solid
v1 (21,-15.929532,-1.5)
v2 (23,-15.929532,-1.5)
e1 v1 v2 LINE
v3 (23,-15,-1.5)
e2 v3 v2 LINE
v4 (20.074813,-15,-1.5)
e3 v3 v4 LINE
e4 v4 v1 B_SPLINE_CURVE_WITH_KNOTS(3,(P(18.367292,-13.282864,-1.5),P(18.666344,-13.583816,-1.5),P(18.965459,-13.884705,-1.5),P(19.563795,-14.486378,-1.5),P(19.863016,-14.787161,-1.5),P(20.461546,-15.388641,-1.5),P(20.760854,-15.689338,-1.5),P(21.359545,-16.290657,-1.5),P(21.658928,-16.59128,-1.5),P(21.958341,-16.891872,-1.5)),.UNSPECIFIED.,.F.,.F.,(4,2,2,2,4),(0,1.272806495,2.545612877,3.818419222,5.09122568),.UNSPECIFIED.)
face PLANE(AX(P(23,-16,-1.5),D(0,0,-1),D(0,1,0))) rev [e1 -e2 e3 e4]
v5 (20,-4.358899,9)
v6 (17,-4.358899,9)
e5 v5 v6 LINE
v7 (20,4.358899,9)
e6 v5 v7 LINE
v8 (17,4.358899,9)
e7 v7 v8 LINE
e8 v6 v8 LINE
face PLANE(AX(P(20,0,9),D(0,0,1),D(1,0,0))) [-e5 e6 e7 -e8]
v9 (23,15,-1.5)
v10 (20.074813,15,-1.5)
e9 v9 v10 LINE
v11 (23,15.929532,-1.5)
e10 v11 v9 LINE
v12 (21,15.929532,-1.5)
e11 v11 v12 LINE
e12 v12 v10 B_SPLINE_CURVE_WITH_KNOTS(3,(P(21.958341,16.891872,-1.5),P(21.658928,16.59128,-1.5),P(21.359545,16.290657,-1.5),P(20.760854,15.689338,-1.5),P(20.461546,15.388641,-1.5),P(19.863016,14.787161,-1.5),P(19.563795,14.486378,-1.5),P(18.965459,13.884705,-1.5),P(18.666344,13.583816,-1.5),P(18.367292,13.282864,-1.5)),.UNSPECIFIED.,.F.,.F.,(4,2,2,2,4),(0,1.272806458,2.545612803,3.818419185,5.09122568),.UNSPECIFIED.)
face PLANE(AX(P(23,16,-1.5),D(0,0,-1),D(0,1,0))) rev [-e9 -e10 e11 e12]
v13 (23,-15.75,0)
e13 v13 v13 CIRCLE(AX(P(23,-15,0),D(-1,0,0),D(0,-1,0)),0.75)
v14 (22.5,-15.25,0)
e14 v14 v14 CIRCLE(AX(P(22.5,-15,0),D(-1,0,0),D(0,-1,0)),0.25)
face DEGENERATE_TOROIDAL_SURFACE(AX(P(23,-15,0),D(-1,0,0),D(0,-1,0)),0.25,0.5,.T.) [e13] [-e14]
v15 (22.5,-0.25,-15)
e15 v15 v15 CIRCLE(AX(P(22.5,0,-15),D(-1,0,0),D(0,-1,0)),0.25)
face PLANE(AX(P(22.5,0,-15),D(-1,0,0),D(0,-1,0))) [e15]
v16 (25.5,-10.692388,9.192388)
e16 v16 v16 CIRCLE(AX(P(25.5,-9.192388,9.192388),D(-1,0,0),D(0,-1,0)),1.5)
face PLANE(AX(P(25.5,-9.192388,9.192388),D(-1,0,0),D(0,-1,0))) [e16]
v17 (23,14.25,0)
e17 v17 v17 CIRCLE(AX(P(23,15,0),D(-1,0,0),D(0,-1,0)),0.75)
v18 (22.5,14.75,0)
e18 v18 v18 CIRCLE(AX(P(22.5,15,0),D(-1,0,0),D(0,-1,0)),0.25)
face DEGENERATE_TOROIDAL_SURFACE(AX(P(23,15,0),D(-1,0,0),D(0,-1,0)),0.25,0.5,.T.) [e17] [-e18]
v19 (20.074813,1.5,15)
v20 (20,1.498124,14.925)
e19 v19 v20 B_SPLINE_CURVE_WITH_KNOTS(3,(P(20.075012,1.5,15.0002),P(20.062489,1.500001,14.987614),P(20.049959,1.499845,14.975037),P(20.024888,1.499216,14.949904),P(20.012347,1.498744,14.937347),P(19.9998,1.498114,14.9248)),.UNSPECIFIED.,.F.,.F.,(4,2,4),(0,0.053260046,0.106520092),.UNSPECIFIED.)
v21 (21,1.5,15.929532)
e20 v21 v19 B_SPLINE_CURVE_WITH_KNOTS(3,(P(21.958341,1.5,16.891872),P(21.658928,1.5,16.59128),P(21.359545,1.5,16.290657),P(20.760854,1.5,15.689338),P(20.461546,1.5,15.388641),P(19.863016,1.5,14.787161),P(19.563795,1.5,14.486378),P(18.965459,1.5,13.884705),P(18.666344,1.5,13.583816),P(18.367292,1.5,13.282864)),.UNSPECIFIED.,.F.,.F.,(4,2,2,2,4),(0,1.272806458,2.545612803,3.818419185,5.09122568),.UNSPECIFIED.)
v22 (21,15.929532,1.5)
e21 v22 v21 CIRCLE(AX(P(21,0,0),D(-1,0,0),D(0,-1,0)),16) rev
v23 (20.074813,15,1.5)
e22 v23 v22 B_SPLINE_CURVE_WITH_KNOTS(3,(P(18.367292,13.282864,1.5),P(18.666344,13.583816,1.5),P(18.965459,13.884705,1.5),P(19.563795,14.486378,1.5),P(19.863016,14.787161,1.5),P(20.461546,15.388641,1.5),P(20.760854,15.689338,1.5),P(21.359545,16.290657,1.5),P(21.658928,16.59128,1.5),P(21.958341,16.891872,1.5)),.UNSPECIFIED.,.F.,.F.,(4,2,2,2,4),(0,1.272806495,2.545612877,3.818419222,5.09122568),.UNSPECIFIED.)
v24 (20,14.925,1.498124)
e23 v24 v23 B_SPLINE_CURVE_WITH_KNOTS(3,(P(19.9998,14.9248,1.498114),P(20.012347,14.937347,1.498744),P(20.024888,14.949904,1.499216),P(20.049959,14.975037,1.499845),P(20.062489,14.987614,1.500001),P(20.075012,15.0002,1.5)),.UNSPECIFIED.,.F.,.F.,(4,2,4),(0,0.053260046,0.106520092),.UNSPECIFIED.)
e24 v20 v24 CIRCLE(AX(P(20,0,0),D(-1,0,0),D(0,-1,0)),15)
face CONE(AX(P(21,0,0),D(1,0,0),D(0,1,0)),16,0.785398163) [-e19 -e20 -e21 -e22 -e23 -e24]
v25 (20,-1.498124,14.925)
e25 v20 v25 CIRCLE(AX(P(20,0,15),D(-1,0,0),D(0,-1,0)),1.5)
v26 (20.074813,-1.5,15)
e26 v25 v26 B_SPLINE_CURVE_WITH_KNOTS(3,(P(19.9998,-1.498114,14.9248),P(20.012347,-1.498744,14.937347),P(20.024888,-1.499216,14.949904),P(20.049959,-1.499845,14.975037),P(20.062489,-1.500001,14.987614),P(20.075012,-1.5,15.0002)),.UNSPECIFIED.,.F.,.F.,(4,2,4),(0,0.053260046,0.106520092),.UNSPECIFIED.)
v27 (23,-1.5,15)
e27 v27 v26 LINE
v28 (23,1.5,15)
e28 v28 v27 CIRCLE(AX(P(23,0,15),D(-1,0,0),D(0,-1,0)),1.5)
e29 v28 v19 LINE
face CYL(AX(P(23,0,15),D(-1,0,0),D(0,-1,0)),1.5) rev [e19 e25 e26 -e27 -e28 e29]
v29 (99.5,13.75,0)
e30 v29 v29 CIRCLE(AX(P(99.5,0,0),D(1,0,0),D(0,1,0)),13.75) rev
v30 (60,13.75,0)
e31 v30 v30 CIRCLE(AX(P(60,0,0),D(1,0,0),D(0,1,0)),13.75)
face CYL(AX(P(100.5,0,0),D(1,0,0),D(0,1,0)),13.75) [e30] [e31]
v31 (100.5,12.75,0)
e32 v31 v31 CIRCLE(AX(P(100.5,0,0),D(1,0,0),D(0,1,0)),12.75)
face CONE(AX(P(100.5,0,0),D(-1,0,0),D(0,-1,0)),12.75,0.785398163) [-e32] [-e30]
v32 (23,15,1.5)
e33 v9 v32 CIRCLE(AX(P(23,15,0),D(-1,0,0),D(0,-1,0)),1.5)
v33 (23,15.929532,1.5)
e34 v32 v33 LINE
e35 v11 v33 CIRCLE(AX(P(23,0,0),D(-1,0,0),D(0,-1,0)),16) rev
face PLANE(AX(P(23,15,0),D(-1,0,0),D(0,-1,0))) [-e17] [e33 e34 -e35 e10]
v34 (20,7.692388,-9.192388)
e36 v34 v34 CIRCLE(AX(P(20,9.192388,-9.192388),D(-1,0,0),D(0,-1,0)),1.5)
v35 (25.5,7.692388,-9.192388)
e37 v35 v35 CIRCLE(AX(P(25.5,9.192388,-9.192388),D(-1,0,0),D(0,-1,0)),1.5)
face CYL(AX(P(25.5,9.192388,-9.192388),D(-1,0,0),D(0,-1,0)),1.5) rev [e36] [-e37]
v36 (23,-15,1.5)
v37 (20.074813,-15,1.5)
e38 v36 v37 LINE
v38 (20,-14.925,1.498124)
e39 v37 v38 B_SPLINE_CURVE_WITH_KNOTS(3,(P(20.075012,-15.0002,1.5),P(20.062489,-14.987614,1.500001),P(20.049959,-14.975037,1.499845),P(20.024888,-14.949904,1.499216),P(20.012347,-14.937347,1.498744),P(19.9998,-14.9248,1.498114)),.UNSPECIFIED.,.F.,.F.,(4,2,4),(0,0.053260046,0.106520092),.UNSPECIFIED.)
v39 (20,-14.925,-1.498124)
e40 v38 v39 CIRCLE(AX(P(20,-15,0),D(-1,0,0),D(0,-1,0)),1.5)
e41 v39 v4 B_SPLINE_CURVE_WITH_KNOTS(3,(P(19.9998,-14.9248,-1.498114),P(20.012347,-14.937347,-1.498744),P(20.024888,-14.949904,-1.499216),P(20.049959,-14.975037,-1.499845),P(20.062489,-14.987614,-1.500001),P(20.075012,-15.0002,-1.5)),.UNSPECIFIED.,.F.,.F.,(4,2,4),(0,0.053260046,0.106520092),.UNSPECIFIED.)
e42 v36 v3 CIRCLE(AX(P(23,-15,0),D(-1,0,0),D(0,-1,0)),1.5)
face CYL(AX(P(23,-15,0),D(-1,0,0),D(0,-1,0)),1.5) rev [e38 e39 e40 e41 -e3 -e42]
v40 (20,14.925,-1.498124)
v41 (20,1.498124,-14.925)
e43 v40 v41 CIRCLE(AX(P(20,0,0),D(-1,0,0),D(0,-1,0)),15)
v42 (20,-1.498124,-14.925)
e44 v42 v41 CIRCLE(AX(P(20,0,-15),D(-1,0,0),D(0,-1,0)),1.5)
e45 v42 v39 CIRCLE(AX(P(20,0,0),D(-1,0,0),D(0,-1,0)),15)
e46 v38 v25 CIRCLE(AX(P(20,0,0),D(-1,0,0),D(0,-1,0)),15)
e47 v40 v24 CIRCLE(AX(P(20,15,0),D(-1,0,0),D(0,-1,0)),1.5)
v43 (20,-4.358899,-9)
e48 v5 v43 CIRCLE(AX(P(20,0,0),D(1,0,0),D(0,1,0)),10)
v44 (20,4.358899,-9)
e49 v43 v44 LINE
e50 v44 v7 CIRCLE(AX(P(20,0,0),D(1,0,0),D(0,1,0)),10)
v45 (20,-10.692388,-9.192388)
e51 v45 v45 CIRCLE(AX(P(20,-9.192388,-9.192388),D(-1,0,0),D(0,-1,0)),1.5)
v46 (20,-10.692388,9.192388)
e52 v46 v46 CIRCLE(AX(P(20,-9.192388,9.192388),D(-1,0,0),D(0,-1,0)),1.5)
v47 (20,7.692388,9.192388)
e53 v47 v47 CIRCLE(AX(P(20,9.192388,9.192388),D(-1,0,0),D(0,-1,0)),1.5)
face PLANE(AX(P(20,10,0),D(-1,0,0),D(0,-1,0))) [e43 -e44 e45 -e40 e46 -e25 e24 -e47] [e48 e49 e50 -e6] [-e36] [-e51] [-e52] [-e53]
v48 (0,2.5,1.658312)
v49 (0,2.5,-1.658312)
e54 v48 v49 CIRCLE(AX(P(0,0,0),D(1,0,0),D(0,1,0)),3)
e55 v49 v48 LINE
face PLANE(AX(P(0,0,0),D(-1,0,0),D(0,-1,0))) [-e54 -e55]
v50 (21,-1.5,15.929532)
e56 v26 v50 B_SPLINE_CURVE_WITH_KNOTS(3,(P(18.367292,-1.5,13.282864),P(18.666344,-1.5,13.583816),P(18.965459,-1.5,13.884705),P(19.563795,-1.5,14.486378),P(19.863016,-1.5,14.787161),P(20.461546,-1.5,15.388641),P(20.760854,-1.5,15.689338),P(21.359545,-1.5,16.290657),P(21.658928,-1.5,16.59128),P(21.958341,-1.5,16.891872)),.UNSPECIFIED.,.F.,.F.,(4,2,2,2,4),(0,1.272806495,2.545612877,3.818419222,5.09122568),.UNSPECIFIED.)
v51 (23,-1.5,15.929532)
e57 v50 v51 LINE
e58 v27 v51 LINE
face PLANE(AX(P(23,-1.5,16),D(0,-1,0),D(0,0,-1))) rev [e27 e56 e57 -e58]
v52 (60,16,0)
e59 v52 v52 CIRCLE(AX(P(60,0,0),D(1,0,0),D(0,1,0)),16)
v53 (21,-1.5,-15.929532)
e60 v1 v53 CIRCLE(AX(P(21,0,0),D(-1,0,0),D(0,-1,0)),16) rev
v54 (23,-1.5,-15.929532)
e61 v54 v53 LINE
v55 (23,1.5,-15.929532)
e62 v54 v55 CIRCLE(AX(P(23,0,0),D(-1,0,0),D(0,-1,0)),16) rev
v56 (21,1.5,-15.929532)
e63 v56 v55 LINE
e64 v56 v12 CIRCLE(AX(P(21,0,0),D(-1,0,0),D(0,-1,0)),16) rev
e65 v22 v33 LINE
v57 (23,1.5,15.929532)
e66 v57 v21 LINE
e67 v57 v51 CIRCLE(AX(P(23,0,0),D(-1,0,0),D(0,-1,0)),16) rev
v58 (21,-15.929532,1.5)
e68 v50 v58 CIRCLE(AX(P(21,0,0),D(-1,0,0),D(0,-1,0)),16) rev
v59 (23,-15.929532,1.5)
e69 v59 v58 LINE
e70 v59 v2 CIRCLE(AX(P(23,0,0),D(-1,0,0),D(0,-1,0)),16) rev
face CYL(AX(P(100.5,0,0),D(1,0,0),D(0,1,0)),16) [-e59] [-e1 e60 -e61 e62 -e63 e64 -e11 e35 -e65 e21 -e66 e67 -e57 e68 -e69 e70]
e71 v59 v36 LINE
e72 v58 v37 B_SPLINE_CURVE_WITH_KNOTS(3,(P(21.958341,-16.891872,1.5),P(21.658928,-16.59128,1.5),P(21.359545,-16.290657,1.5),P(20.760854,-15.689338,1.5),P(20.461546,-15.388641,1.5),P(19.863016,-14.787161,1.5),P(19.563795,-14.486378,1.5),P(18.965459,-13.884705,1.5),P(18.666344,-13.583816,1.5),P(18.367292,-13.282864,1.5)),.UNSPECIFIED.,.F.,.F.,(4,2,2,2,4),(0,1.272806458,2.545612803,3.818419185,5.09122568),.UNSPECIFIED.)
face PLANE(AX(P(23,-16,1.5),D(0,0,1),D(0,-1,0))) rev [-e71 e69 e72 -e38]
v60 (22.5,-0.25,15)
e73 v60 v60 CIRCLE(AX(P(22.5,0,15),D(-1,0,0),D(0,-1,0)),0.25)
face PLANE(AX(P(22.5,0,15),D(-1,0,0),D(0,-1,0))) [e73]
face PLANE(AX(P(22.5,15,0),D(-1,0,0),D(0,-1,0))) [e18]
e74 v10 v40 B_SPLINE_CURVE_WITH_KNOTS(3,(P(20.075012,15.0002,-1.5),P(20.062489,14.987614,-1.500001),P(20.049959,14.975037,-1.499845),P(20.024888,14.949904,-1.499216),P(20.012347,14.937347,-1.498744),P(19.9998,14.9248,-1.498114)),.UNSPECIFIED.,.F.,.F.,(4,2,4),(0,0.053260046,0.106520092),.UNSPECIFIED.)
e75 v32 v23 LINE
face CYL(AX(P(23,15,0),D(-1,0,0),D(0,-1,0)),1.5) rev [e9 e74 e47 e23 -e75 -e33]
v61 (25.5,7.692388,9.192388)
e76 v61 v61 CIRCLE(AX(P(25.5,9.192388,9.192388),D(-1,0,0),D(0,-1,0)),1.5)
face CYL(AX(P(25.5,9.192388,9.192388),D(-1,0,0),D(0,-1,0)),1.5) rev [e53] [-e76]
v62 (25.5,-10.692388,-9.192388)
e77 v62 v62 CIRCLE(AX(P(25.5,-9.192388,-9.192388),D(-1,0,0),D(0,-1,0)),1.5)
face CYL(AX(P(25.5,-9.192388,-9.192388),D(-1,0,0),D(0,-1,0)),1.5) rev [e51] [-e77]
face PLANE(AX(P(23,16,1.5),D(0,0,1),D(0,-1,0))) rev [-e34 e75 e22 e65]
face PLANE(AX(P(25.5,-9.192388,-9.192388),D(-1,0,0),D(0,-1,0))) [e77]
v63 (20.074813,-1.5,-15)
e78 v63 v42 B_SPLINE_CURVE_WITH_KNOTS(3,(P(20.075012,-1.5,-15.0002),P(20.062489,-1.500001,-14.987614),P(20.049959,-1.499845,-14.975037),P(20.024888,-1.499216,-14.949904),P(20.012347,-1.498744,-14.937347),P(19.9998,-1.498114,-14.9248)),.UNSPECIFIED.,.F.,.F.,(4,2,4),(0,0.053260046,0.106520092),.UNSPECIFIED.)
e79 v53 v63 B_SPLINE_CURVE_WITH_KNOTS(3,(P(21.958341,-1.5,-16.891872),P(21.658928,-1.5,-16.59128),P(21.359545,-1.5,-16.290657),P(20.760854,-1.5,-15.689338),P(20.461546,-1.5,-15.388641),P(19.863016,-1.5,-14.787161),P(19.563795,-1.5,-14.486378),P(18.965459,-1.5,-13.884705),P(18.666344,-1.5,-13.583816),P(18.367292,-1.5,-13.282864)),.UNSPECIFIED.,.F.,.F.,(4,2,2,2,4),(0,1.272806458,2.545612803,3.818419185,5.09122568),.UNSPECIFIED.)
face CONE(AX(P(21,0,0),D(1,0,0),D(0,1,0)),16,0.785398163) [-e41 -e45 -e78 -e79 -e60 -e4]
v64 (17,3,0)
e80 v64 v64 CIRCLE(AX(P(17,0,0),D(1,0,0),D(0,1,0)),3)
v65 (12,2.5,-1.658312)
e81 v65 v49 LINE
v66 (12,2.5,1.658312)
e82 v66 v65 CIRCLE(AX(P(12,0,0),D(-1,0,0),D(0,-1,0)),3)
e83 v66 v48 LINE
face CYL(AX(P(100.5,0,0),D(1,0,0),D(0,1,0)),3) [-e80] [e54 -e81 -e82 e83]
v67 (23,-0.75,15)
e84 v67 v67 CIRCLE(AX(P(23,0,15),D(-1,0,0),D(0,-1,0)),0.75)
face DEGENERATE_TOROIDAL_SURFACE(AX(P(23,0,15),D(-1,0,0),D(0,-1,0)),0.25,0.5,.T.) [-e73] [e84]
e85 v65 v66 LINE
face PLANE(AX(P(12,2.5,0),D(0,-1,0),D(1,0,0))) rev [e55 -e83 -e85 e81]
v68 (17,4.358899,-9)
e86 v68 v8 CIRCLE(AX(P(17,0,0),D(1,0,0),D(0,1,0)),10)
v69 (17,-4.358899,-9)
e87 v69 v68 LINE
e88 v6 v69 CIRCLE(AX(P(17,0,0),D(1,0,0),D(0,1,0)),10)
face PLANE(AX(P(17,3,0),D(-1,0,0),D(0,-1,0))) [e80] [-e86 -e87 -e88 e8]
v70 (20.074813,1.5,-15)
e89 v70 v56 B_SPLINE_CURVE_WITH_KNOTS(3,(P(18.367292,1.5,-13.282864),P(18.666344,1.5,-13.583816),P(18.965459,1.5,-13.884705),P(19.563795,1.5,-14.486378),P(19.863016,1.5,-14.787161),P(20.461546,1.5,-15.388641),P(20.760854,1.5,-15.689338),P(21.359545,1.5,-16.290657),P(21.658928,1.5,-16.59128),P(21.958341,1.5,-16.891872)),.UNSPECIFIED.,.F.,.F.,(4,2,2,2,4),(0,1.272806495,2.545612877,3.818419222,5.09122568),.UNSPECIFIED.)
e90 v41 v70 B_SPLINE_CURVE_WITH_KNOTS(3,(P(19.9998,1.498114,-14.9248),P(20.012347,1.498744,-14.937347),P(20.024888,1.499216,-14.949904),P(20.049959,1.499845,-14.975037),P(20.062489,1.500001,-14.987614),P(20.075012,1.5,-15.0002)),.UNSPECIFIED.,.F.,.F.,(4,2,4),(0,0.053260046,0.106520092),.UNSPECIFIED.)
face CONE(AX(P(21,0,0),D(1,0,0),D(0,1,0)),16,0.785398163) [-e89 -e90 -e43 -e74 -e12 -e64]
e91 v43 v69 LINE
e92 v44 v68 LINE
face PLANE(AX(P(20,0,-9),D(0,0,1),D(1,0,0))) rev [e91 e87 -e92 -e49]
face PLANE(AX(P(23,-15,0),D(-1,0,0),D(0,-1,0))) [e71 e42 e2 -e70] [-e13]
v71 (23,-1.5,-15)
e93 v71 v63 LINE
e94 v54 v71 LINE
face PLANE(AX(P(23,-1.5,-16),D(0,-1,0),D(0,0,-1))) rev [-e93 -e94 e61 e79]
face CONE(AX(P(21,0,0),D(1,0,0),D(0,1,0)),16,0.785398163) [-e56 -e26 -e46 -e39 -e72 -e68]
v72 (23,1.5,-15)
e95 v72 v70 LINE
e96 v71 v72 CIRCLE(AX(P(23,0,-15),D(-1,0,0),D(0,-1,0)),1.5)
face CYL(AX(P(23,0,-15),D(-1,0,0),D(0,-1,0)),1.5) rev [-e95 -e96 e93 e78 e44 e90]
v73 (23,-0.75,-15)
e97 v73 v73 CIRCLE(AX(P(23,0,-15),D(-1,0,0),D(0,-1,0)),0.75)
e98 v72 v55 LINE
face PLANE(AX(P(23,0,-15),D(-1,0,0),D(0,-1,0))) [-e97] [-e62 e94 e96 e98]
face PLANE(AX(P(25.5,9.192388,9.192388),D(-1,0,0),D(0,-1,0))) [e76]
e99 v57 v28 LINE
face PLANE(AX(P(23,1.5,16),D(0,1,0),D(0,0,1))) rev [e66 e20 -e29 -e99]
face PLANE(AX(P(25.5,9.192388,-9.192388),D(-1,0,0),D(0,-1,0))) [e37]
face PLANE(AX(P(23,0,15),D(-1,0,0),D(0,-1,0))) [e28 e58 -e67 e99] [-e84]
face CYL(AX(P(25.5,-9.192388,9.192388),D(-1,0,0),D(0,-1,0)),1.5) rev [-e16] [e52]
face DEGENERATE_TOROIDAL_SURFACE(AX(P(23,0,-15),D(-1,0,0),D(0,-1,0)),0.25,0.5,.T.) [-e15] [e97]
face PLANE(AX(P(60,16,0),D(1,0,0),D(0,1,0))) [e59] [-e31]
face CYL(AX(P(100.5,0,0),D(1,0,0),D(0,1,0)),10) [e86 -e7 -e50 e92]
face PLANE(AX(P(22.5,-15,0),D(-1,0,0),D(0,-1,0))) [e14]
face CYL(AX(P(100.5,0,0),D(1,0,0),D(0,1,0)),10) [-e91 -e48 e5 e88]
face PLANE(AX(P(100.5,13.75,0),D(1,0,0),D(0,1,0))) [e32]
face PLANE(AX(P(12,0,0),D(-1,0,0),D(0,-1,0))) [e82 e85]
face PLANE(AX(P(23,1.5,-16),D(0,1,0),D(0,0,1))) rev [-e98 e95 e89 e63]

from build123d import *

# Parameters (mm, degrees)
ENL_V_START             = -12
ENL_V_MAT_EXTRU_1_DEPTH = 12
ENL_V_START_2           = -3
ENL_V_MAT_EXTRU_2_DEPTH = 3
CHANFREIN1_SIZE         = 1
ENL_V_MAT_EXTRU_3_DEPTH = 3
ESQUISSE5_R             = 0.75
BOSS_EXTRU_1_DEPTH      = 0.5
CONG_1_R                = 0.5
ESQUISSE6_R             = 1.5
ENL_V_MAT_EXTRU_4_DEPTH = 5.5
CHANFREIN2_SIZE         = 1


with BuildPart() as part:
    # Esquisse1 → Révolution1 (revolve)
    with BuildSketch(Plane.XY):
        Polygon((0, 0), (0, 3), (17, 3), (17, 10), (20, 10), (20, 16), (60, 16), (60, 13.75), (100.5, 13.75), (100.5, 0), align=None)
    revolve(axis=Axis((100.5, 0, 0), (-1, 0, 0)))

    # Esquisse2 → Enlèv. mat.-Extru.1 (cut)
    with BuildSketch(Plane.ZY.offset(ENL_V_START)):
        with BuildLine():
            Line((-1.658312395, 2.5), (1.658312395, 2.5))
            ThreePointArc((1.658312395, 2.5), (0, 3), (-1.658312395, 2.5))
        make_face()
    extrude(amount=ENL_V_MAT_EXTRU_1_DEPTH, mode=Mode.SUBTRACT)

    # Esquisse3 → Enlèv. mat.-Extru.2 (cut)
    with BuildSketch(Plane.ZY.offset(-17).offset(ENL_V_START_2)):
        with BuildLine():
            ThreePointArc((-9, 4.358898944), (-10, 0), (-9, -4.358898944))
            Line((-9, -4.358898944), (-9, 4.358898944))
        make_face()
        with BuildLine():
            Line((9, 4.358898944), (9, -4.358898944))
            ThreePointArc((9, -4.358898944), (9.746794345, -2.236067977), (10, 0))
            ThreePointArc((10, 0), (9.746794345, 2.236067977), (9, 4.358898944))
        make_face()
    extrude(amount=ENL_V_MAT_EXTRU_2_DEPTH, mode=Mode.SUBTRACT)

    # Chanfrein1
    chanfrein1_edges = [part.edges().sort_by_distance(p)[0] for p in [
        (20, -16, 0),
    ]]
    chamfer(chanfrein1_edges, length=CHANFREIN1_SIZE)

    # Esquisse4 → Enlèv. mat.-Extru.3 (cut)
    with BuildSketch(Plane.ZY.offset(-20)):
        with BuildLine():
            Line((16, 1.5), (15, 1.5))
            ThreePointArc((15, 1.5), (13.5, 0), (15, -1.5))
            Line((15, -1.5), (16, -1.5))
            Line((16, -1.5), (16, 1.5))
        make_face()
        with BuildLine():
            Line((1.5, -16), (1.5, -15))
            ThreePointArc((1.5, -15), (0, -13.5), (-1.5, -15))
            Line((-1.5, -15), (-1.5, -16))
            Line((-1.5, -16), (1.5, -16))
        make_face()
        with BuildLine():
            Line((-16, -1.5), (-15, -1.5))
            ThreePointArc((-15, -1.5), (-13.5, 0), (-15, 1.5))
            Line((-15, 1.5), (-16, 1.5))
            Line((-16, 1.5), (-16, -1.5))
        make_face()
        with BuildLine():
            Line((-1.5, 16), (-1.5, 15))
            ThreePointArc((-1.5, 15), (0, 13.5), (1.5, 15))
            Line((1.5, 15), (1.5, 16))
            Line((1.5, 16), (-1.5, 16))
        make_face()
    extrude(amount=-ENL_V_MAT_EXTRU_3_DEPTH, mode=Mode.SUBTRACT)

    # Esquisse5 → Boss.-Extru.1 (add)
    with BuildSketch(Plane.ZY.offset(-23)):
        with Locations(Location((0, 15, 0), (0, 0, 270))):
            Circle(ESQUISSE5_R)
        with Locations(Location((15, 0, 0), (0, 0, 270))):
            Circle(ESQUISSE5_R)
        with Locations(Location((0, -15, 0), (0, 0, 270))):
            Circle(ESQUISSE5_R)
        with Locations(Location((-15, 0, 0), (0, 0, 270))):
            Circle(ESQUISSE5_R)
    extrude(amount=BOSS_EXTRU_1_DEPTH)

    # Congé1
    cong_1_edges = [part.edges().sort_by_distance(p)[0] for p in [
        (22.5, 15.75, 0),
        (22.5, 0.75, 15),
        (22.5, -14.25, 0),
        (22.5, 0.75, -15),
    ]]
    fillet(cong_1_edges, radius=CONG_1_R - 0.0001)  # a hair under: the kernel refuses the full size

    # Esquisse6 → Enlèv. mat.-Extru.4 (cut)
    with BuildSketch(Plane.ZY.offset(-20)):
        with Locations(Location((9.192388155, 9.192388155, 0), (0, 0, 270))):
            Circle(ESQUISSE6_R)
        with Locations(Location((9.192388155, -9.192388155, 0), (0, 0, 270))):
            Circle(ESQUISSE6_R)
        with Locations(Location((-9.192388155, -9.192388155, 0), (0, 0, 270))):
            Circle(ESQUISSE6_R)
        with Locations(Location((-9.192388155, 9.192388155, 0), (0, 0, 270))):
            Circle(ESQUISSE6_R)
    extrude(amount=-ENL_V_MAT_EXTRU_4_DEPTH, mode=Mode.SUBTRACT)

    # Chanfrein2
    chanfrein2_edges = [part.edges().sort_by_distance(p)[0] for p in [
        (100.5, -13.75, 0),
    ]]
    chamfer(chanfrein2_edges, length=CHANFREIN2_SIZE)


solid = part.part
